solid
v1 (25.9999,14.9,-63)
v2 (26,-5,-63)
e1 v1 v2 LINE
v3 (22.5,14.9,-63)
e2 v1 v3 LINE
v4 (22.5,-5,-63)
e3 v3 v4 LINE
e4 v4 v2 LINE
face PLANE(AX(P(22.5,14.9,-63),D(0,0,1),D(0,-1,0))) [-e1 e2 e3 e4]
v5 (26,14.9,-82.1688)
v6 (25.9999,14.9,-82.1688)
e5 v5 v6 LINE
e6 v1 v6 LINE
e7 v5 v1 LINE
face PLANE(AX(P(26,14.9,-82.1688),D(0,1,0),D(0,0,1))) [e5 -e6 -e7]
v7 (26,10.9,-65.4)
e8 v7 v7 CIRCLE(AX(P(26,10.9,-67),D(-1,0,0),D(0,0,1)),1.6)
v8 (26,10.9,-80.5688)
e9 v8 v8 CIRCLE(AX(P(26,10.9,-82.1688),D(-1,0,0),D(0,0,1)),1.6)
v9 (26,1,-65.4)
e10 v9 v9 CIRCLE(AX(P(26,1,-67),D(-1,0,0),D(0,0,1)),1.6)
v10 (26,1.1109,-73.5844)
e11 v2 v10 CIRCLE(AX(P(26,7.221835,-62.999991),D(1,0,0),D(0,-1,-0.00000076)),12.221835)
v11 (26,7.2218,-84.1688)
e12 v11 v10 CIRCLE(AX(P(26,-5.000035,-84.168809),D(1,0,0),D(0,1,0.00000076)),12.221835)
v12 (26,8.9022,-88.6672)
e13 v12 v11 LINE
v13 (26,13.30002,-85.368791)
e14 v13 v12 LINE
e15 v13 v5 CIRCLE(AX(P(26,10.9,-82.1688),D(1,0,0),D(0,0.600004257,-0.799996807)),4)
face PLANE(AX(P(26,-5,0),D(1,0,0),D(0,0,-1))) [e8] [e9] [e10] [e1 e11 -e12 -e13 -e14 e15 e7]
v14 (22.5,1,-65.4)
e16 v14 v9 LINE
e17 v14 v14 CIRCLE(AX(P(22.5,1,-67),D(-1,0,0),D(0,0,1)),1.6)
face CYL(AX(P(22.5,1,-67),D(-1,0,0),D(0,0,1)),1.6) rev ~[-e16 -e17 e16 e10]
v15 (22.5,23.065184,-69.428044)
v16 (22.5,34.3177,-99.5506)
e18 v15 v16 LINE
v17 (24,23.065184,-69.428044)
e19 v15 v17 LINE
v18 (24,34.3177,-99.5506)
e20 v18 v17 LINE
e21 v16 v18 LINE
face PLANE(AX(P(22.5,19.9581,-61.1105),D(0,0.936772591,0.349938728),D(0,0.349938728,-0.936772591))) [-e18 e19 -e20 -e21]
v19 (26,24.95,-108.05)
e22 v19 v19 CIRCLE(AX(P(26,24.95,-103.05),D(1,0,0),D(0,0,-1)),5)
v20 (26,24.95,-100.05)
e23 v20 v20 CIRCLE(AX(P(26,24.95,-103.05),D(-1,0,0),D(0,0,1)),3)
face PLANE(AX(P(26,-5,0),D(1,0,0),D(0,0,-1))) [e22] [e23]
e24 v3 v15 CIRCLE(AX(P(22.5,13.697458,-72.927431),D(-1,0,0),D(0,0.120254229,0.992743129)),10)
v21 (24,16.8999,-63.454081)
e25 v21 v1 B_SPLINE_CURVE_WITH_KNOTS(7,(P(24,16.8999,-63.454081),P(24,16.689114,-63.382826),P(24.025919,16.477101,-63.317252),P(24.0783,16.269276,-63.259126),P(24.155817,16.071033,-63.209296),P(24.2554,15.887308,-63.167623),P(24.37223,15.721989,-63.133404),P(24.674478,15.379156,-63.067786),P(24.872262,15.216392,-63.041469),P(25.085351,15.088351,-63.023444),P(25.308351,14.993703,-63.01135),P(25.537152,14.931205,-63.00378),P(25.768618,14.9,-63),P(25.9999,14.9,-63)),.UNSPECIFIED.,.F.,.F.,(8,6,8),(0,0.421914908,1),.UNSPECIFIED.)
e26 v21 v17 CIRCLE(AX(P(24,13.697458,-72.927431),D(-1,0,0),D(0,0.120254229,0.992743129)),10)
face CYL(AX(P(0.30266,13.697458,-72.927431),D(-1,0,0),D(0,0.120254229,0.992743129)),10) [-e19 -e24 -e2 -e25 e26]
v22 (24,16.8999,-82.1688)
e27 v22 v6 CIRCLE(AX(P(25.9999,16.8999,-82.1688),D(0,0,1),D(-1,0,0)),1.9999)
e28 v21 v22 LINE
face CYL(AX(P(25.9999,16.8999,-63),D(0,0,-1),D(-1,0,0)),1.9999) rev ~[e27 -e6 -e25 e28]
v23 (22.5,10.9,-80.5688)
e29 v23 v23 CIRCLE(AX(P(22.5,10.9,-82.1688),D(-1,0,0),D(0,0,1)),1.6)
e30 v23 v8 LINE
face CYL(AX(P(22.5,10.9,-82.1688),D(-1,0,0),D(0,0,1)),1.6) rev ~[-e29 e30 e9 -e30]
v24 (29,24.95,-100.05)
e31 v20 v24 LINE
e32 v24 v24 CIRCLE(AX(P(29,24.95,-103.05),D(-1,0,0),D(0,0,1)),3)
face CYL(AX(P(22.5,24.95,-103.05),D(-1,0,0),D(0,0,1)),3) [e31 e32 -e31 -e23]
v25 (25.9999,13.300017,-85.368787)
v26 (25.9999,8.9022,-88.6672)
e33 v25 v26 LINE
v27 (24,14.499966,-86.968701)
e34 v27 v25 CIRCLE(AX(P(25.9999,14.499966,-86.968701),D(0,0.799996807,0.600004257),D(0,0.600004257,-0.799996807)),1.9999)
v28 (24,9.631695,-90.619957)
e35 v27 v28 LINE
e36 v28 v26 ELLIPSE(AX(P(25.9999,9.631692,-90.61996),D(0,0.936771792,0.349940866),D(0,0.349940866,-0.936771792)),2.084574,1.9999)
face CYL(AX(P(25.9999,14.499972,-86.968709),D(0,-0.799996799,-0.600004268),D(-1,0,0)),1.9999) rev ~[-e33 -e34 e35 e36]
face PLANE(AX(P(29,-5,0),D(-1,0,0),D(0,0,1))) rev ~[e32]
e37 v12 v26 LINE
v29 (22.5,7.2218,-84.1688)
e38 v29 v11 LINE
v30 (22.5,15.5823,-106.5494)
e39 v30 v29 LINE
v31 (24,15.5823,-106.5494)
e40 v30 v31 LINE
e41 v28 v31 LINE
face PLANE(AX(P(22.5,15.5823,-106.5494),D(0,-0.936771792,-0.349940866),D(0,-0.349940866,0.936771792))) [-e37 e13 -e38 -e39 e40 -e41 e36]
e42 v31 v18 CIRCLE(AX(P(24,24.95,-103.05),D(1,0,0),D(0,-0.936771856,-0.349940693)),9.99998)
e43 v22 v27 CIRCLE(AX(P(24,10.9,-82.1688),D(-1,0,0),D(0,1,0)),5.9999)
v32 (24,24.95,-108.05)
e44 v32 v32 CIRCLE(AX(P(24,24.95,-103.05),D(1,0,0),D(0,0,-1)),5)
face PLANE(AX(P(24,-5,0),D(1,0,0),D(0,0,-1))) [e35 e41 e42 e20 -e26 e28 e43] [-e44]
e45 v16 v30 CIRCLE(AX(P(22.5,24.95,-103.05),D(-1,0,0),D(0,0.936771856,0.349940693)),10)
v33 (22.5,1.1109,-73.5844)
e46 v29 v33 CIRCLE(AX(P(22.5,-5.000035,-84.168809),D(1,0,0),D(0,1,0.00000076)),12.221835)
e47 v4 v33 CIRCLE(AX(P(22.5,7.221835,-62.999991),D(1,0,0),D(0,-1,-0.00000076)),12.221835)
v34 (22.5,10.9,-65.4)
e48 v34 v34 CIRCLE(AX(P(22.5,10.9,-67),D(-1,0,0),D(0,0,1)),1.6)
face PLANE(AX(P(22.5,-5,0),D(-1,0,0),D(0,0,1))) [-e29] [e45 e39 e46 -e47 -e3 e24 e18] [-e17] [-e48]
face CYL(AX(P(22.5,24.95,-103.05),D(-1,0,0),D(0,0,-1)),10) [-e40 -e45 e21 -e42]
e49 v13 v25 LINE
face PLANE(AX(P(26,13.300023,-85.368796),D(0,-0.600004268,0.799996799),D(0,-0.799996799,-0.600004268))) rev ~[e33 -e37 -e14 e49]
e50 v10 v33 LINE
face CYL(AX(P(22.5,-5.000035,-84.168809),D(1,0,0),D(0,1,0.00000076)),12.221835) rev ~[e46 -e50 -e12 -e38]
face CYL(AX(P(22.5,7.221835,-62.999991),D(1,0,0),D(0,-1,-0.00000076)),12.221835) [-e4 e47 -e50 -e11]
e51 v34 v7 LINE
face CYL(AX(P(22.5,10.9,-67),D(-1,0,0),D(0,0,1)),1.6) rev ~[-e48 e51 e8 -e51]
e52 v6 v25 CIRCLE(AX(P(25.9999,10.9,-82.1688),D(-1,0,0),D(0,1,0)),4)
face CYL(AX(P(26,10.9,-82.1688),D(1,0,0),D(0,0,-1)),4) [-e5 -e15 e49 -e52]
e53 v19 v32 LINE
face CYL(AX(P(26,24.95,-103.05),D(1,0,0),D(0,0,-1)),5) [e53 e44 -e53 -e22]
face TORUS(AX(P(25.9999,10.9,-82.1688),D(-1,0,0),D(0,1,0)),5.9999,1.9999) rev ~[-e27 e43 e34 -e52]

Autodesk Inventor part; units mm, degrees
sketch "スケッチ1" plane through (0, 0, 0) normal (0, 1, 0) x (-1, 0, 0)
  line L0 (11.25, 0) -> (-11.25, 0)
  line L1 (-11.25, 0) -> (-11.25, -120)
  line L2 (-11.25, -120) -> (11.25, -120)
  line L3 (11.25, -120) -> (11.25, 0)
  point P0 (0, 0)
  point P1 (0, 0)
  dimension "d0" = 22.5
  dimension "d3" = 120
extrude "押し出し1" add sketch "スケッチ1" along normal blind 2
sketch "スケッチ2" plane through (0, 0, 0) normal (0, -1, 0) x (1, 0, 0)
  line L0 (19, -120) -> (-19, -120)
  line L1 (-19, -120) -> (-19, -103.05)
  line L2 (-19, -103.05) -> (19, -103.05)
  line L3 (19, -103.05) -> (19, -120)
  line L4 (11.25, -120) -> (-11.25, -120) projected
  point P0 (0, 0)
  point P1 (0, -120)
  dimension "d6" = 38
  dimension "d11" = 16.95
extrude "押し出し2" add sketch "スケッチ2" against normal blind 13.44
sketch "スケッチ4" plane through (11.25, 0, -103.05) normal (0, 0, 1) x (1, 0, 0)
  circle A0 centre (-11.25, 20) radius 20
  line L0 (7.75, 0) -> (0, 0) projected
  line L1 (-22.5, 0) -> (0, 0) projected
  point P0 (-11.25, 0)
  point P1 (-11.25, 0)
  dimension "d12" = 40
extrude "押し出し4" cut sketch "スケッチ4" along normal through all
sketch "スケッチ5" plane through (11.25, 0, -103.05) normal (0, 0, 1) x (1, 0, 0)
  circle A0 centre (-11.25, 20) radius 20
  arc A1 (-11.25, 0) -> (-2.5322, 2) centre (-11.25, 20) ccw projected
  line L0 (-30.25, 13.44) -> (7.75, 13.44)
  line L1 (7.75, 13.44) -> (7.75, -5)
  line L2 (7.75, -5) -> (-30.25, -5)
  line L3 (-30.25, -5) -> (-30.25, 13.44)
  line L4 (7.75, 0) -> (7.75, 13.44) projected
  line L5 (7.75, 0) -> (0, 0) projected
  line L6 (-30.25, 4.22) -> (-11.25, 20)
  line L7 (-11.25, 20) -> (7.75, 4.22)
  point P0 (3.875, 0)
  point P1 (7.6436, 13.44)
  point P2 (-30.1436, 13.44)
  point P3 (7.75, 4.22)
  point P4 (4.1356, 7.2218)
  point P5 (-26.6356, 7.2218)
  point P6 (-3.3514, 13.44)
  point P7 (-19.1486, 13.44)
  dimension "d15" = 5
extrude "押し出し5" add sketch "スケッチ5" along normal up to surface (103.05 mm away) contours A0 L7 L1 L2 L3 L6
sketch "スケッチ24" plane through (11.25, 0, -103.05) normal (0, 0, -1) x (-1, 0, 0)
  line L0 (-7.75, 0) -> (11.25, 0) projected
  line L1 (-7.75, -5) -> (-7.75, 0) projected
  line L2 (30.25, -5) -> (-7.75, -5) projected
  line L3 (30.25, 0) -> (30.25, -5) projected
  line L4 (11.25, 0) -> (30.25, 0) projected
  point P0 (11.25, 0)
extrude "押し出し22" add sketch "スケッチ24" along normal up to surface (16.95 mm away)
sketch "スケッチ25" plane through (19, 13.44, -103.05) normal (1, 0, 0) x (0, 0, -1)
  line L0 (-103.05, -13.44) -> (-103.05, -6.2182) projected
  line L1 (16.95, -18.44) -> (16.95, 0) projected
  line L2 (16.95, -13.44) -> (-40.05, -13.44)
  line L3 (-40.05, -13.44) -> (-40.05, 1.46)
  line L4 (-40.05, 1.46) -> (16.95, 1.46)
  line L5 (16.95, 1.46) -> (16.95, -13.44)
  dimension "d77" = 14.9
  dimension "d78" = 57
extrude "押し出し23" add sketch "スケッチ25" against normal up to surface (38 mm away)
sketch "スケッチ26" plane through (19, -5, 0) normal (1, 0, 0) x (0, 0, -1)
  line L0 (63, 12.2218) -> (0, 12.2218) projected
  circle A0 centre (63, 12.2218) radius 12.2218
  line L1 (0, 0) -> (120, 0) projected
  circle A1 centre (84.1688, 0) radius 12.2218
  line L2 (84.1688, 12.2218) -> (120, 12.2218)
  line L3 (120, 0) -> (120, 19.9) projected
  point P0 (0, 5)
  point P1 (73.5844, 6.1109)
  point P2 (63, 0)
extrude "押し出し24" cut sketch "スケッチ26" against normal through all contours A1 L1 A0 | A1 L1 | L2 L3 L1 A1 picked at (80.2991, 4.512)
sketch "スケッチ28" plane through (19, -5, 0) normal (1, 0, 0) x (0, 0, -1)
  circle A0 centre (103.05, 29.95) radius 18.95
  line L0 (120, 12.2218) -> (120, 19.9) projected
  line L1 (120, 19.9) -> (63, 19.9) projected
  line L2 (84.1688, 12.2218) -> (120, 12.2218) projected
  point P0 (0, 5)
  point P1 (96.3557, 12.2218)
  point P2 (86.9845, 19.9)
  dimension "d83" = 16.95
  dimension "d84" = 10.05
  dimension "d85" = 37.9
extrude "押し出し25" cut sketch "スケッチ28" against normal through all contours L1 A0 L2 | L1 L0 L2 A0
fillet "フィレット4" radius 2 1 edges at (0, 7.2218, -96.3557)
ref_plane "作業平面4" through (22.5, -5, 0) normal (1, 0, 0) x (0, 0, -1)
ref_plane "作業平面5" through (-23.5, -5, 0) normal (-1, 0, 0) x (0, 0, 1)
sketch "スケッチ29" plane through (22.5, -5, 0) normal (1, 0, 0) x (0, 0, -1)
  line L0 (63, 19.9) -> (63, 9.22) projected
  line L1 (86.9845, 19.9) -> (63, 19.9) projected
  arc A0 (84.1688, 12.2218) -> (73.5844, 6.1109) centre (84.1688, 0) ccw projected
  arc A1 (63, 0) -> (73.5844, 6.1109) centre (63, 12.2218) ccw projected
  line L2 (63, 9.22) -> (0, 9.22) projected
  line L3 (63, 9.22) -> (63, -0.3745)
  line L4 (84.1688, 12.2218) -> (84.1688, 19.9)
  point P0 (0, 5)
  point P1 (63, 0)
extrude "押し出し26" add sketch "スケッチ29" against normal up to surface (46 mm away)
fillet "フィレット5" radius 2 4 edges at (19, 11.0609, -84.1688) (19, -0.39, -63) (-19, -0.39, -63) (-19, 11.0609, -84.1688)
ref_plane "作業平面6" through (0, 20, -45) normal (0, 0, 1) x (1, 0, 0)
sketch "スケッチ31" plane through (0, 20, -45) normal (0, 0, 1) x (1, 0, 0)
  circle A0 centre (0, 0) radius 22
  arc A1 (-15.3856, -12.7782) -> (15.3856, -12.7782) centre (0, 0) ccw projected
  point P0 (0, -20)
  dimension "d95" = 44
extrude "押し出し27" cut sketch "スケッチ31" along normal blind 12
sketch "スケッチ32" plane through (22.5, -5, 0) normal (1, 0, 0) x (0, 0, -1)
  line L0 (63, 19.9) -> (63, 0) projected
  arc A0 (63, 0) -> (73.5844, 6.1109) centre (63, 12.2218) ccw projected
  arc A1 (84.1688, 12.2218) -> (73.5844, 6.1109) centre (84.1688, 0) ccw projected
  line L1 (84.1688, 12.2218) -> (84.1688, 19.9) projected
  line L2 (84.1688, 19.9) -> (63, 19.9) projected
  circle A2 centre (103.05, 29.95) radius 4
  circle A3 centre (103.05, 29.95) radius 10
  line L3 (99.5506, 39.3177) -> (106.5494, 20.5823)
  line L4 (106.5494, 20.5823) -> (68.1093, 6.2226)
  line L5 (68.1093, 6.2226) -> (61.1105, 24.9581)
  line L6 (61.1105, 24.9581) -> (99.5506, 39.3177)
  point P0 (0, 5)
  dimension "d98" = 40.05
  dimension "d99" = 10.05
  dimension "d100" = 8
  dimension "d101" = 20
extrude "押し出し28" add sketch "スケッチ32" along normal blind 3.5 contours L5 L4 A1 A0 L0 | L5 L6 A3 L4 L1 L2 | L2 L1 A1 L4 L5 | L3 A2 A3 | A3 L3 A2 | L3 A2 | A2 L3
sketch "スケッチ33" plane through (22.5, -5, 0) normal (-1, 0, 0) x (0, 0, 1)
  line L0 (73.7681, 73.9475) -> (-168.83, 73.9475)
  line L1 (-168.83, 73.9475) -> (-168.83, -57.4645)
  line L2 (-168.83, -57.4645) -> (73.7681, -57.4645)
  line L3 (73.7681, -57.4645) -> (73.7681, 73.9475)
  point P0 (0, 5)
extrude "押し出し29" cut sketch "スケッチ33" along normal through all
sketch "スケッチ34" plane through (22.5, -5, 0) normal (-1, 0, 0) x (0, 0, 1)
  arc A0 (-99.5506, 39.3177) -> (-106.5494, 20.5823) centre (-103.05, 29.95) ccw projected
  circle A1 centre (-103.05, 29.95) radius 3
  point P0 (0, 5)
  dimension "d106" = 6
extrude "押し出し30" add sketch "スケッチ34" against normal blind 6.5
sketch "スケッチ35" plane through (22.5, -5, 0) normal (-1, 0, 0) x (0, 0, 1)
  circle A0 centre (-67, 6) radius 1.6 projected
  circle A1 centre (-67, 15.9) radius 1.6 projected
  circle A2 centre (-82.1688, 15.9) radius 1.6 projected
  point P0 (0, 5)
extrude "押し出し31" cut sketch "スケッチ35" against normal through all
sketch "スケッチ36" plane through (26, -5, 0) normal (1, 0, 0) x (0, 0, -1)
  line L0 (84.1688, 19.9) -> (63, 19.9) projected
  line L1 (84.1688, 12.2218) -> (84.1688, 19.9) projected
  circle A0 centre (82.1688, 15.9) radius 1.35 projected
  circle A1 centre (82.1688, 15.9) radius 4
  line L2 (84.1688, 19.9) -> (88.6672, 13.9022)
  circle A2 centre (67, 6) radius 1.6 projected
  circle A3 centre (67, 15.9) radius 1.6 projected
  circle A4 centre (82.1688, 15.9) radius 1.6 projected
  circle A5 centre (103.05, 29.95) radius 3 projected
  line L3 (99.5506, 39.3177) -> (61.1105, 24.9581) projected
  line L4 (61.1105, 24.9581) -> (63, 19.9) projected
  line L5 (63, 19.9) -> (63, 0) projected
  arc A6 (63, 0) -> (73.5844, 6.1109) centre (63, 12.2218) ccw projected
  arc A7 (84.1688, 12.2218) -> (73.5844, 6.1109) centre (84.1688, 0) ccw projected
  line L6 (84.1688, 12.2218) -> (106.5494, 20.5823) projected
  arc A8 (106.5494, 20.5823) -> (99.5506, 39.3177) centre (103.05, 29.95) ccw projected
  circle A9 centre (103.05, 29.95) radius 5
  circle A10 centre (103.05, 29.95) radius 3 projected
  point P0 (0, 5)
  point P1 (82.1688, 19.9)
  point P2 (85.3688, 18.3)
  dimension "d111" = 10
extrude "押し出し32" cut sketch "スケッチ36" against normal blind 2 contours L1 A1 L0 | L2 A1 L1 | L0 L4 L3 A8 L6 L2
fillet "フィレット6" radius 2 3 edges at (24, 14.4777, -83.9577) (24, 11.1011, -87.018) (24, 14.9, -72.5844)
fillet "フィレット7" radius 10 1 edges at (23.25, 19.9581, -61.1105)
properties part number "fore_arm_side_left"
